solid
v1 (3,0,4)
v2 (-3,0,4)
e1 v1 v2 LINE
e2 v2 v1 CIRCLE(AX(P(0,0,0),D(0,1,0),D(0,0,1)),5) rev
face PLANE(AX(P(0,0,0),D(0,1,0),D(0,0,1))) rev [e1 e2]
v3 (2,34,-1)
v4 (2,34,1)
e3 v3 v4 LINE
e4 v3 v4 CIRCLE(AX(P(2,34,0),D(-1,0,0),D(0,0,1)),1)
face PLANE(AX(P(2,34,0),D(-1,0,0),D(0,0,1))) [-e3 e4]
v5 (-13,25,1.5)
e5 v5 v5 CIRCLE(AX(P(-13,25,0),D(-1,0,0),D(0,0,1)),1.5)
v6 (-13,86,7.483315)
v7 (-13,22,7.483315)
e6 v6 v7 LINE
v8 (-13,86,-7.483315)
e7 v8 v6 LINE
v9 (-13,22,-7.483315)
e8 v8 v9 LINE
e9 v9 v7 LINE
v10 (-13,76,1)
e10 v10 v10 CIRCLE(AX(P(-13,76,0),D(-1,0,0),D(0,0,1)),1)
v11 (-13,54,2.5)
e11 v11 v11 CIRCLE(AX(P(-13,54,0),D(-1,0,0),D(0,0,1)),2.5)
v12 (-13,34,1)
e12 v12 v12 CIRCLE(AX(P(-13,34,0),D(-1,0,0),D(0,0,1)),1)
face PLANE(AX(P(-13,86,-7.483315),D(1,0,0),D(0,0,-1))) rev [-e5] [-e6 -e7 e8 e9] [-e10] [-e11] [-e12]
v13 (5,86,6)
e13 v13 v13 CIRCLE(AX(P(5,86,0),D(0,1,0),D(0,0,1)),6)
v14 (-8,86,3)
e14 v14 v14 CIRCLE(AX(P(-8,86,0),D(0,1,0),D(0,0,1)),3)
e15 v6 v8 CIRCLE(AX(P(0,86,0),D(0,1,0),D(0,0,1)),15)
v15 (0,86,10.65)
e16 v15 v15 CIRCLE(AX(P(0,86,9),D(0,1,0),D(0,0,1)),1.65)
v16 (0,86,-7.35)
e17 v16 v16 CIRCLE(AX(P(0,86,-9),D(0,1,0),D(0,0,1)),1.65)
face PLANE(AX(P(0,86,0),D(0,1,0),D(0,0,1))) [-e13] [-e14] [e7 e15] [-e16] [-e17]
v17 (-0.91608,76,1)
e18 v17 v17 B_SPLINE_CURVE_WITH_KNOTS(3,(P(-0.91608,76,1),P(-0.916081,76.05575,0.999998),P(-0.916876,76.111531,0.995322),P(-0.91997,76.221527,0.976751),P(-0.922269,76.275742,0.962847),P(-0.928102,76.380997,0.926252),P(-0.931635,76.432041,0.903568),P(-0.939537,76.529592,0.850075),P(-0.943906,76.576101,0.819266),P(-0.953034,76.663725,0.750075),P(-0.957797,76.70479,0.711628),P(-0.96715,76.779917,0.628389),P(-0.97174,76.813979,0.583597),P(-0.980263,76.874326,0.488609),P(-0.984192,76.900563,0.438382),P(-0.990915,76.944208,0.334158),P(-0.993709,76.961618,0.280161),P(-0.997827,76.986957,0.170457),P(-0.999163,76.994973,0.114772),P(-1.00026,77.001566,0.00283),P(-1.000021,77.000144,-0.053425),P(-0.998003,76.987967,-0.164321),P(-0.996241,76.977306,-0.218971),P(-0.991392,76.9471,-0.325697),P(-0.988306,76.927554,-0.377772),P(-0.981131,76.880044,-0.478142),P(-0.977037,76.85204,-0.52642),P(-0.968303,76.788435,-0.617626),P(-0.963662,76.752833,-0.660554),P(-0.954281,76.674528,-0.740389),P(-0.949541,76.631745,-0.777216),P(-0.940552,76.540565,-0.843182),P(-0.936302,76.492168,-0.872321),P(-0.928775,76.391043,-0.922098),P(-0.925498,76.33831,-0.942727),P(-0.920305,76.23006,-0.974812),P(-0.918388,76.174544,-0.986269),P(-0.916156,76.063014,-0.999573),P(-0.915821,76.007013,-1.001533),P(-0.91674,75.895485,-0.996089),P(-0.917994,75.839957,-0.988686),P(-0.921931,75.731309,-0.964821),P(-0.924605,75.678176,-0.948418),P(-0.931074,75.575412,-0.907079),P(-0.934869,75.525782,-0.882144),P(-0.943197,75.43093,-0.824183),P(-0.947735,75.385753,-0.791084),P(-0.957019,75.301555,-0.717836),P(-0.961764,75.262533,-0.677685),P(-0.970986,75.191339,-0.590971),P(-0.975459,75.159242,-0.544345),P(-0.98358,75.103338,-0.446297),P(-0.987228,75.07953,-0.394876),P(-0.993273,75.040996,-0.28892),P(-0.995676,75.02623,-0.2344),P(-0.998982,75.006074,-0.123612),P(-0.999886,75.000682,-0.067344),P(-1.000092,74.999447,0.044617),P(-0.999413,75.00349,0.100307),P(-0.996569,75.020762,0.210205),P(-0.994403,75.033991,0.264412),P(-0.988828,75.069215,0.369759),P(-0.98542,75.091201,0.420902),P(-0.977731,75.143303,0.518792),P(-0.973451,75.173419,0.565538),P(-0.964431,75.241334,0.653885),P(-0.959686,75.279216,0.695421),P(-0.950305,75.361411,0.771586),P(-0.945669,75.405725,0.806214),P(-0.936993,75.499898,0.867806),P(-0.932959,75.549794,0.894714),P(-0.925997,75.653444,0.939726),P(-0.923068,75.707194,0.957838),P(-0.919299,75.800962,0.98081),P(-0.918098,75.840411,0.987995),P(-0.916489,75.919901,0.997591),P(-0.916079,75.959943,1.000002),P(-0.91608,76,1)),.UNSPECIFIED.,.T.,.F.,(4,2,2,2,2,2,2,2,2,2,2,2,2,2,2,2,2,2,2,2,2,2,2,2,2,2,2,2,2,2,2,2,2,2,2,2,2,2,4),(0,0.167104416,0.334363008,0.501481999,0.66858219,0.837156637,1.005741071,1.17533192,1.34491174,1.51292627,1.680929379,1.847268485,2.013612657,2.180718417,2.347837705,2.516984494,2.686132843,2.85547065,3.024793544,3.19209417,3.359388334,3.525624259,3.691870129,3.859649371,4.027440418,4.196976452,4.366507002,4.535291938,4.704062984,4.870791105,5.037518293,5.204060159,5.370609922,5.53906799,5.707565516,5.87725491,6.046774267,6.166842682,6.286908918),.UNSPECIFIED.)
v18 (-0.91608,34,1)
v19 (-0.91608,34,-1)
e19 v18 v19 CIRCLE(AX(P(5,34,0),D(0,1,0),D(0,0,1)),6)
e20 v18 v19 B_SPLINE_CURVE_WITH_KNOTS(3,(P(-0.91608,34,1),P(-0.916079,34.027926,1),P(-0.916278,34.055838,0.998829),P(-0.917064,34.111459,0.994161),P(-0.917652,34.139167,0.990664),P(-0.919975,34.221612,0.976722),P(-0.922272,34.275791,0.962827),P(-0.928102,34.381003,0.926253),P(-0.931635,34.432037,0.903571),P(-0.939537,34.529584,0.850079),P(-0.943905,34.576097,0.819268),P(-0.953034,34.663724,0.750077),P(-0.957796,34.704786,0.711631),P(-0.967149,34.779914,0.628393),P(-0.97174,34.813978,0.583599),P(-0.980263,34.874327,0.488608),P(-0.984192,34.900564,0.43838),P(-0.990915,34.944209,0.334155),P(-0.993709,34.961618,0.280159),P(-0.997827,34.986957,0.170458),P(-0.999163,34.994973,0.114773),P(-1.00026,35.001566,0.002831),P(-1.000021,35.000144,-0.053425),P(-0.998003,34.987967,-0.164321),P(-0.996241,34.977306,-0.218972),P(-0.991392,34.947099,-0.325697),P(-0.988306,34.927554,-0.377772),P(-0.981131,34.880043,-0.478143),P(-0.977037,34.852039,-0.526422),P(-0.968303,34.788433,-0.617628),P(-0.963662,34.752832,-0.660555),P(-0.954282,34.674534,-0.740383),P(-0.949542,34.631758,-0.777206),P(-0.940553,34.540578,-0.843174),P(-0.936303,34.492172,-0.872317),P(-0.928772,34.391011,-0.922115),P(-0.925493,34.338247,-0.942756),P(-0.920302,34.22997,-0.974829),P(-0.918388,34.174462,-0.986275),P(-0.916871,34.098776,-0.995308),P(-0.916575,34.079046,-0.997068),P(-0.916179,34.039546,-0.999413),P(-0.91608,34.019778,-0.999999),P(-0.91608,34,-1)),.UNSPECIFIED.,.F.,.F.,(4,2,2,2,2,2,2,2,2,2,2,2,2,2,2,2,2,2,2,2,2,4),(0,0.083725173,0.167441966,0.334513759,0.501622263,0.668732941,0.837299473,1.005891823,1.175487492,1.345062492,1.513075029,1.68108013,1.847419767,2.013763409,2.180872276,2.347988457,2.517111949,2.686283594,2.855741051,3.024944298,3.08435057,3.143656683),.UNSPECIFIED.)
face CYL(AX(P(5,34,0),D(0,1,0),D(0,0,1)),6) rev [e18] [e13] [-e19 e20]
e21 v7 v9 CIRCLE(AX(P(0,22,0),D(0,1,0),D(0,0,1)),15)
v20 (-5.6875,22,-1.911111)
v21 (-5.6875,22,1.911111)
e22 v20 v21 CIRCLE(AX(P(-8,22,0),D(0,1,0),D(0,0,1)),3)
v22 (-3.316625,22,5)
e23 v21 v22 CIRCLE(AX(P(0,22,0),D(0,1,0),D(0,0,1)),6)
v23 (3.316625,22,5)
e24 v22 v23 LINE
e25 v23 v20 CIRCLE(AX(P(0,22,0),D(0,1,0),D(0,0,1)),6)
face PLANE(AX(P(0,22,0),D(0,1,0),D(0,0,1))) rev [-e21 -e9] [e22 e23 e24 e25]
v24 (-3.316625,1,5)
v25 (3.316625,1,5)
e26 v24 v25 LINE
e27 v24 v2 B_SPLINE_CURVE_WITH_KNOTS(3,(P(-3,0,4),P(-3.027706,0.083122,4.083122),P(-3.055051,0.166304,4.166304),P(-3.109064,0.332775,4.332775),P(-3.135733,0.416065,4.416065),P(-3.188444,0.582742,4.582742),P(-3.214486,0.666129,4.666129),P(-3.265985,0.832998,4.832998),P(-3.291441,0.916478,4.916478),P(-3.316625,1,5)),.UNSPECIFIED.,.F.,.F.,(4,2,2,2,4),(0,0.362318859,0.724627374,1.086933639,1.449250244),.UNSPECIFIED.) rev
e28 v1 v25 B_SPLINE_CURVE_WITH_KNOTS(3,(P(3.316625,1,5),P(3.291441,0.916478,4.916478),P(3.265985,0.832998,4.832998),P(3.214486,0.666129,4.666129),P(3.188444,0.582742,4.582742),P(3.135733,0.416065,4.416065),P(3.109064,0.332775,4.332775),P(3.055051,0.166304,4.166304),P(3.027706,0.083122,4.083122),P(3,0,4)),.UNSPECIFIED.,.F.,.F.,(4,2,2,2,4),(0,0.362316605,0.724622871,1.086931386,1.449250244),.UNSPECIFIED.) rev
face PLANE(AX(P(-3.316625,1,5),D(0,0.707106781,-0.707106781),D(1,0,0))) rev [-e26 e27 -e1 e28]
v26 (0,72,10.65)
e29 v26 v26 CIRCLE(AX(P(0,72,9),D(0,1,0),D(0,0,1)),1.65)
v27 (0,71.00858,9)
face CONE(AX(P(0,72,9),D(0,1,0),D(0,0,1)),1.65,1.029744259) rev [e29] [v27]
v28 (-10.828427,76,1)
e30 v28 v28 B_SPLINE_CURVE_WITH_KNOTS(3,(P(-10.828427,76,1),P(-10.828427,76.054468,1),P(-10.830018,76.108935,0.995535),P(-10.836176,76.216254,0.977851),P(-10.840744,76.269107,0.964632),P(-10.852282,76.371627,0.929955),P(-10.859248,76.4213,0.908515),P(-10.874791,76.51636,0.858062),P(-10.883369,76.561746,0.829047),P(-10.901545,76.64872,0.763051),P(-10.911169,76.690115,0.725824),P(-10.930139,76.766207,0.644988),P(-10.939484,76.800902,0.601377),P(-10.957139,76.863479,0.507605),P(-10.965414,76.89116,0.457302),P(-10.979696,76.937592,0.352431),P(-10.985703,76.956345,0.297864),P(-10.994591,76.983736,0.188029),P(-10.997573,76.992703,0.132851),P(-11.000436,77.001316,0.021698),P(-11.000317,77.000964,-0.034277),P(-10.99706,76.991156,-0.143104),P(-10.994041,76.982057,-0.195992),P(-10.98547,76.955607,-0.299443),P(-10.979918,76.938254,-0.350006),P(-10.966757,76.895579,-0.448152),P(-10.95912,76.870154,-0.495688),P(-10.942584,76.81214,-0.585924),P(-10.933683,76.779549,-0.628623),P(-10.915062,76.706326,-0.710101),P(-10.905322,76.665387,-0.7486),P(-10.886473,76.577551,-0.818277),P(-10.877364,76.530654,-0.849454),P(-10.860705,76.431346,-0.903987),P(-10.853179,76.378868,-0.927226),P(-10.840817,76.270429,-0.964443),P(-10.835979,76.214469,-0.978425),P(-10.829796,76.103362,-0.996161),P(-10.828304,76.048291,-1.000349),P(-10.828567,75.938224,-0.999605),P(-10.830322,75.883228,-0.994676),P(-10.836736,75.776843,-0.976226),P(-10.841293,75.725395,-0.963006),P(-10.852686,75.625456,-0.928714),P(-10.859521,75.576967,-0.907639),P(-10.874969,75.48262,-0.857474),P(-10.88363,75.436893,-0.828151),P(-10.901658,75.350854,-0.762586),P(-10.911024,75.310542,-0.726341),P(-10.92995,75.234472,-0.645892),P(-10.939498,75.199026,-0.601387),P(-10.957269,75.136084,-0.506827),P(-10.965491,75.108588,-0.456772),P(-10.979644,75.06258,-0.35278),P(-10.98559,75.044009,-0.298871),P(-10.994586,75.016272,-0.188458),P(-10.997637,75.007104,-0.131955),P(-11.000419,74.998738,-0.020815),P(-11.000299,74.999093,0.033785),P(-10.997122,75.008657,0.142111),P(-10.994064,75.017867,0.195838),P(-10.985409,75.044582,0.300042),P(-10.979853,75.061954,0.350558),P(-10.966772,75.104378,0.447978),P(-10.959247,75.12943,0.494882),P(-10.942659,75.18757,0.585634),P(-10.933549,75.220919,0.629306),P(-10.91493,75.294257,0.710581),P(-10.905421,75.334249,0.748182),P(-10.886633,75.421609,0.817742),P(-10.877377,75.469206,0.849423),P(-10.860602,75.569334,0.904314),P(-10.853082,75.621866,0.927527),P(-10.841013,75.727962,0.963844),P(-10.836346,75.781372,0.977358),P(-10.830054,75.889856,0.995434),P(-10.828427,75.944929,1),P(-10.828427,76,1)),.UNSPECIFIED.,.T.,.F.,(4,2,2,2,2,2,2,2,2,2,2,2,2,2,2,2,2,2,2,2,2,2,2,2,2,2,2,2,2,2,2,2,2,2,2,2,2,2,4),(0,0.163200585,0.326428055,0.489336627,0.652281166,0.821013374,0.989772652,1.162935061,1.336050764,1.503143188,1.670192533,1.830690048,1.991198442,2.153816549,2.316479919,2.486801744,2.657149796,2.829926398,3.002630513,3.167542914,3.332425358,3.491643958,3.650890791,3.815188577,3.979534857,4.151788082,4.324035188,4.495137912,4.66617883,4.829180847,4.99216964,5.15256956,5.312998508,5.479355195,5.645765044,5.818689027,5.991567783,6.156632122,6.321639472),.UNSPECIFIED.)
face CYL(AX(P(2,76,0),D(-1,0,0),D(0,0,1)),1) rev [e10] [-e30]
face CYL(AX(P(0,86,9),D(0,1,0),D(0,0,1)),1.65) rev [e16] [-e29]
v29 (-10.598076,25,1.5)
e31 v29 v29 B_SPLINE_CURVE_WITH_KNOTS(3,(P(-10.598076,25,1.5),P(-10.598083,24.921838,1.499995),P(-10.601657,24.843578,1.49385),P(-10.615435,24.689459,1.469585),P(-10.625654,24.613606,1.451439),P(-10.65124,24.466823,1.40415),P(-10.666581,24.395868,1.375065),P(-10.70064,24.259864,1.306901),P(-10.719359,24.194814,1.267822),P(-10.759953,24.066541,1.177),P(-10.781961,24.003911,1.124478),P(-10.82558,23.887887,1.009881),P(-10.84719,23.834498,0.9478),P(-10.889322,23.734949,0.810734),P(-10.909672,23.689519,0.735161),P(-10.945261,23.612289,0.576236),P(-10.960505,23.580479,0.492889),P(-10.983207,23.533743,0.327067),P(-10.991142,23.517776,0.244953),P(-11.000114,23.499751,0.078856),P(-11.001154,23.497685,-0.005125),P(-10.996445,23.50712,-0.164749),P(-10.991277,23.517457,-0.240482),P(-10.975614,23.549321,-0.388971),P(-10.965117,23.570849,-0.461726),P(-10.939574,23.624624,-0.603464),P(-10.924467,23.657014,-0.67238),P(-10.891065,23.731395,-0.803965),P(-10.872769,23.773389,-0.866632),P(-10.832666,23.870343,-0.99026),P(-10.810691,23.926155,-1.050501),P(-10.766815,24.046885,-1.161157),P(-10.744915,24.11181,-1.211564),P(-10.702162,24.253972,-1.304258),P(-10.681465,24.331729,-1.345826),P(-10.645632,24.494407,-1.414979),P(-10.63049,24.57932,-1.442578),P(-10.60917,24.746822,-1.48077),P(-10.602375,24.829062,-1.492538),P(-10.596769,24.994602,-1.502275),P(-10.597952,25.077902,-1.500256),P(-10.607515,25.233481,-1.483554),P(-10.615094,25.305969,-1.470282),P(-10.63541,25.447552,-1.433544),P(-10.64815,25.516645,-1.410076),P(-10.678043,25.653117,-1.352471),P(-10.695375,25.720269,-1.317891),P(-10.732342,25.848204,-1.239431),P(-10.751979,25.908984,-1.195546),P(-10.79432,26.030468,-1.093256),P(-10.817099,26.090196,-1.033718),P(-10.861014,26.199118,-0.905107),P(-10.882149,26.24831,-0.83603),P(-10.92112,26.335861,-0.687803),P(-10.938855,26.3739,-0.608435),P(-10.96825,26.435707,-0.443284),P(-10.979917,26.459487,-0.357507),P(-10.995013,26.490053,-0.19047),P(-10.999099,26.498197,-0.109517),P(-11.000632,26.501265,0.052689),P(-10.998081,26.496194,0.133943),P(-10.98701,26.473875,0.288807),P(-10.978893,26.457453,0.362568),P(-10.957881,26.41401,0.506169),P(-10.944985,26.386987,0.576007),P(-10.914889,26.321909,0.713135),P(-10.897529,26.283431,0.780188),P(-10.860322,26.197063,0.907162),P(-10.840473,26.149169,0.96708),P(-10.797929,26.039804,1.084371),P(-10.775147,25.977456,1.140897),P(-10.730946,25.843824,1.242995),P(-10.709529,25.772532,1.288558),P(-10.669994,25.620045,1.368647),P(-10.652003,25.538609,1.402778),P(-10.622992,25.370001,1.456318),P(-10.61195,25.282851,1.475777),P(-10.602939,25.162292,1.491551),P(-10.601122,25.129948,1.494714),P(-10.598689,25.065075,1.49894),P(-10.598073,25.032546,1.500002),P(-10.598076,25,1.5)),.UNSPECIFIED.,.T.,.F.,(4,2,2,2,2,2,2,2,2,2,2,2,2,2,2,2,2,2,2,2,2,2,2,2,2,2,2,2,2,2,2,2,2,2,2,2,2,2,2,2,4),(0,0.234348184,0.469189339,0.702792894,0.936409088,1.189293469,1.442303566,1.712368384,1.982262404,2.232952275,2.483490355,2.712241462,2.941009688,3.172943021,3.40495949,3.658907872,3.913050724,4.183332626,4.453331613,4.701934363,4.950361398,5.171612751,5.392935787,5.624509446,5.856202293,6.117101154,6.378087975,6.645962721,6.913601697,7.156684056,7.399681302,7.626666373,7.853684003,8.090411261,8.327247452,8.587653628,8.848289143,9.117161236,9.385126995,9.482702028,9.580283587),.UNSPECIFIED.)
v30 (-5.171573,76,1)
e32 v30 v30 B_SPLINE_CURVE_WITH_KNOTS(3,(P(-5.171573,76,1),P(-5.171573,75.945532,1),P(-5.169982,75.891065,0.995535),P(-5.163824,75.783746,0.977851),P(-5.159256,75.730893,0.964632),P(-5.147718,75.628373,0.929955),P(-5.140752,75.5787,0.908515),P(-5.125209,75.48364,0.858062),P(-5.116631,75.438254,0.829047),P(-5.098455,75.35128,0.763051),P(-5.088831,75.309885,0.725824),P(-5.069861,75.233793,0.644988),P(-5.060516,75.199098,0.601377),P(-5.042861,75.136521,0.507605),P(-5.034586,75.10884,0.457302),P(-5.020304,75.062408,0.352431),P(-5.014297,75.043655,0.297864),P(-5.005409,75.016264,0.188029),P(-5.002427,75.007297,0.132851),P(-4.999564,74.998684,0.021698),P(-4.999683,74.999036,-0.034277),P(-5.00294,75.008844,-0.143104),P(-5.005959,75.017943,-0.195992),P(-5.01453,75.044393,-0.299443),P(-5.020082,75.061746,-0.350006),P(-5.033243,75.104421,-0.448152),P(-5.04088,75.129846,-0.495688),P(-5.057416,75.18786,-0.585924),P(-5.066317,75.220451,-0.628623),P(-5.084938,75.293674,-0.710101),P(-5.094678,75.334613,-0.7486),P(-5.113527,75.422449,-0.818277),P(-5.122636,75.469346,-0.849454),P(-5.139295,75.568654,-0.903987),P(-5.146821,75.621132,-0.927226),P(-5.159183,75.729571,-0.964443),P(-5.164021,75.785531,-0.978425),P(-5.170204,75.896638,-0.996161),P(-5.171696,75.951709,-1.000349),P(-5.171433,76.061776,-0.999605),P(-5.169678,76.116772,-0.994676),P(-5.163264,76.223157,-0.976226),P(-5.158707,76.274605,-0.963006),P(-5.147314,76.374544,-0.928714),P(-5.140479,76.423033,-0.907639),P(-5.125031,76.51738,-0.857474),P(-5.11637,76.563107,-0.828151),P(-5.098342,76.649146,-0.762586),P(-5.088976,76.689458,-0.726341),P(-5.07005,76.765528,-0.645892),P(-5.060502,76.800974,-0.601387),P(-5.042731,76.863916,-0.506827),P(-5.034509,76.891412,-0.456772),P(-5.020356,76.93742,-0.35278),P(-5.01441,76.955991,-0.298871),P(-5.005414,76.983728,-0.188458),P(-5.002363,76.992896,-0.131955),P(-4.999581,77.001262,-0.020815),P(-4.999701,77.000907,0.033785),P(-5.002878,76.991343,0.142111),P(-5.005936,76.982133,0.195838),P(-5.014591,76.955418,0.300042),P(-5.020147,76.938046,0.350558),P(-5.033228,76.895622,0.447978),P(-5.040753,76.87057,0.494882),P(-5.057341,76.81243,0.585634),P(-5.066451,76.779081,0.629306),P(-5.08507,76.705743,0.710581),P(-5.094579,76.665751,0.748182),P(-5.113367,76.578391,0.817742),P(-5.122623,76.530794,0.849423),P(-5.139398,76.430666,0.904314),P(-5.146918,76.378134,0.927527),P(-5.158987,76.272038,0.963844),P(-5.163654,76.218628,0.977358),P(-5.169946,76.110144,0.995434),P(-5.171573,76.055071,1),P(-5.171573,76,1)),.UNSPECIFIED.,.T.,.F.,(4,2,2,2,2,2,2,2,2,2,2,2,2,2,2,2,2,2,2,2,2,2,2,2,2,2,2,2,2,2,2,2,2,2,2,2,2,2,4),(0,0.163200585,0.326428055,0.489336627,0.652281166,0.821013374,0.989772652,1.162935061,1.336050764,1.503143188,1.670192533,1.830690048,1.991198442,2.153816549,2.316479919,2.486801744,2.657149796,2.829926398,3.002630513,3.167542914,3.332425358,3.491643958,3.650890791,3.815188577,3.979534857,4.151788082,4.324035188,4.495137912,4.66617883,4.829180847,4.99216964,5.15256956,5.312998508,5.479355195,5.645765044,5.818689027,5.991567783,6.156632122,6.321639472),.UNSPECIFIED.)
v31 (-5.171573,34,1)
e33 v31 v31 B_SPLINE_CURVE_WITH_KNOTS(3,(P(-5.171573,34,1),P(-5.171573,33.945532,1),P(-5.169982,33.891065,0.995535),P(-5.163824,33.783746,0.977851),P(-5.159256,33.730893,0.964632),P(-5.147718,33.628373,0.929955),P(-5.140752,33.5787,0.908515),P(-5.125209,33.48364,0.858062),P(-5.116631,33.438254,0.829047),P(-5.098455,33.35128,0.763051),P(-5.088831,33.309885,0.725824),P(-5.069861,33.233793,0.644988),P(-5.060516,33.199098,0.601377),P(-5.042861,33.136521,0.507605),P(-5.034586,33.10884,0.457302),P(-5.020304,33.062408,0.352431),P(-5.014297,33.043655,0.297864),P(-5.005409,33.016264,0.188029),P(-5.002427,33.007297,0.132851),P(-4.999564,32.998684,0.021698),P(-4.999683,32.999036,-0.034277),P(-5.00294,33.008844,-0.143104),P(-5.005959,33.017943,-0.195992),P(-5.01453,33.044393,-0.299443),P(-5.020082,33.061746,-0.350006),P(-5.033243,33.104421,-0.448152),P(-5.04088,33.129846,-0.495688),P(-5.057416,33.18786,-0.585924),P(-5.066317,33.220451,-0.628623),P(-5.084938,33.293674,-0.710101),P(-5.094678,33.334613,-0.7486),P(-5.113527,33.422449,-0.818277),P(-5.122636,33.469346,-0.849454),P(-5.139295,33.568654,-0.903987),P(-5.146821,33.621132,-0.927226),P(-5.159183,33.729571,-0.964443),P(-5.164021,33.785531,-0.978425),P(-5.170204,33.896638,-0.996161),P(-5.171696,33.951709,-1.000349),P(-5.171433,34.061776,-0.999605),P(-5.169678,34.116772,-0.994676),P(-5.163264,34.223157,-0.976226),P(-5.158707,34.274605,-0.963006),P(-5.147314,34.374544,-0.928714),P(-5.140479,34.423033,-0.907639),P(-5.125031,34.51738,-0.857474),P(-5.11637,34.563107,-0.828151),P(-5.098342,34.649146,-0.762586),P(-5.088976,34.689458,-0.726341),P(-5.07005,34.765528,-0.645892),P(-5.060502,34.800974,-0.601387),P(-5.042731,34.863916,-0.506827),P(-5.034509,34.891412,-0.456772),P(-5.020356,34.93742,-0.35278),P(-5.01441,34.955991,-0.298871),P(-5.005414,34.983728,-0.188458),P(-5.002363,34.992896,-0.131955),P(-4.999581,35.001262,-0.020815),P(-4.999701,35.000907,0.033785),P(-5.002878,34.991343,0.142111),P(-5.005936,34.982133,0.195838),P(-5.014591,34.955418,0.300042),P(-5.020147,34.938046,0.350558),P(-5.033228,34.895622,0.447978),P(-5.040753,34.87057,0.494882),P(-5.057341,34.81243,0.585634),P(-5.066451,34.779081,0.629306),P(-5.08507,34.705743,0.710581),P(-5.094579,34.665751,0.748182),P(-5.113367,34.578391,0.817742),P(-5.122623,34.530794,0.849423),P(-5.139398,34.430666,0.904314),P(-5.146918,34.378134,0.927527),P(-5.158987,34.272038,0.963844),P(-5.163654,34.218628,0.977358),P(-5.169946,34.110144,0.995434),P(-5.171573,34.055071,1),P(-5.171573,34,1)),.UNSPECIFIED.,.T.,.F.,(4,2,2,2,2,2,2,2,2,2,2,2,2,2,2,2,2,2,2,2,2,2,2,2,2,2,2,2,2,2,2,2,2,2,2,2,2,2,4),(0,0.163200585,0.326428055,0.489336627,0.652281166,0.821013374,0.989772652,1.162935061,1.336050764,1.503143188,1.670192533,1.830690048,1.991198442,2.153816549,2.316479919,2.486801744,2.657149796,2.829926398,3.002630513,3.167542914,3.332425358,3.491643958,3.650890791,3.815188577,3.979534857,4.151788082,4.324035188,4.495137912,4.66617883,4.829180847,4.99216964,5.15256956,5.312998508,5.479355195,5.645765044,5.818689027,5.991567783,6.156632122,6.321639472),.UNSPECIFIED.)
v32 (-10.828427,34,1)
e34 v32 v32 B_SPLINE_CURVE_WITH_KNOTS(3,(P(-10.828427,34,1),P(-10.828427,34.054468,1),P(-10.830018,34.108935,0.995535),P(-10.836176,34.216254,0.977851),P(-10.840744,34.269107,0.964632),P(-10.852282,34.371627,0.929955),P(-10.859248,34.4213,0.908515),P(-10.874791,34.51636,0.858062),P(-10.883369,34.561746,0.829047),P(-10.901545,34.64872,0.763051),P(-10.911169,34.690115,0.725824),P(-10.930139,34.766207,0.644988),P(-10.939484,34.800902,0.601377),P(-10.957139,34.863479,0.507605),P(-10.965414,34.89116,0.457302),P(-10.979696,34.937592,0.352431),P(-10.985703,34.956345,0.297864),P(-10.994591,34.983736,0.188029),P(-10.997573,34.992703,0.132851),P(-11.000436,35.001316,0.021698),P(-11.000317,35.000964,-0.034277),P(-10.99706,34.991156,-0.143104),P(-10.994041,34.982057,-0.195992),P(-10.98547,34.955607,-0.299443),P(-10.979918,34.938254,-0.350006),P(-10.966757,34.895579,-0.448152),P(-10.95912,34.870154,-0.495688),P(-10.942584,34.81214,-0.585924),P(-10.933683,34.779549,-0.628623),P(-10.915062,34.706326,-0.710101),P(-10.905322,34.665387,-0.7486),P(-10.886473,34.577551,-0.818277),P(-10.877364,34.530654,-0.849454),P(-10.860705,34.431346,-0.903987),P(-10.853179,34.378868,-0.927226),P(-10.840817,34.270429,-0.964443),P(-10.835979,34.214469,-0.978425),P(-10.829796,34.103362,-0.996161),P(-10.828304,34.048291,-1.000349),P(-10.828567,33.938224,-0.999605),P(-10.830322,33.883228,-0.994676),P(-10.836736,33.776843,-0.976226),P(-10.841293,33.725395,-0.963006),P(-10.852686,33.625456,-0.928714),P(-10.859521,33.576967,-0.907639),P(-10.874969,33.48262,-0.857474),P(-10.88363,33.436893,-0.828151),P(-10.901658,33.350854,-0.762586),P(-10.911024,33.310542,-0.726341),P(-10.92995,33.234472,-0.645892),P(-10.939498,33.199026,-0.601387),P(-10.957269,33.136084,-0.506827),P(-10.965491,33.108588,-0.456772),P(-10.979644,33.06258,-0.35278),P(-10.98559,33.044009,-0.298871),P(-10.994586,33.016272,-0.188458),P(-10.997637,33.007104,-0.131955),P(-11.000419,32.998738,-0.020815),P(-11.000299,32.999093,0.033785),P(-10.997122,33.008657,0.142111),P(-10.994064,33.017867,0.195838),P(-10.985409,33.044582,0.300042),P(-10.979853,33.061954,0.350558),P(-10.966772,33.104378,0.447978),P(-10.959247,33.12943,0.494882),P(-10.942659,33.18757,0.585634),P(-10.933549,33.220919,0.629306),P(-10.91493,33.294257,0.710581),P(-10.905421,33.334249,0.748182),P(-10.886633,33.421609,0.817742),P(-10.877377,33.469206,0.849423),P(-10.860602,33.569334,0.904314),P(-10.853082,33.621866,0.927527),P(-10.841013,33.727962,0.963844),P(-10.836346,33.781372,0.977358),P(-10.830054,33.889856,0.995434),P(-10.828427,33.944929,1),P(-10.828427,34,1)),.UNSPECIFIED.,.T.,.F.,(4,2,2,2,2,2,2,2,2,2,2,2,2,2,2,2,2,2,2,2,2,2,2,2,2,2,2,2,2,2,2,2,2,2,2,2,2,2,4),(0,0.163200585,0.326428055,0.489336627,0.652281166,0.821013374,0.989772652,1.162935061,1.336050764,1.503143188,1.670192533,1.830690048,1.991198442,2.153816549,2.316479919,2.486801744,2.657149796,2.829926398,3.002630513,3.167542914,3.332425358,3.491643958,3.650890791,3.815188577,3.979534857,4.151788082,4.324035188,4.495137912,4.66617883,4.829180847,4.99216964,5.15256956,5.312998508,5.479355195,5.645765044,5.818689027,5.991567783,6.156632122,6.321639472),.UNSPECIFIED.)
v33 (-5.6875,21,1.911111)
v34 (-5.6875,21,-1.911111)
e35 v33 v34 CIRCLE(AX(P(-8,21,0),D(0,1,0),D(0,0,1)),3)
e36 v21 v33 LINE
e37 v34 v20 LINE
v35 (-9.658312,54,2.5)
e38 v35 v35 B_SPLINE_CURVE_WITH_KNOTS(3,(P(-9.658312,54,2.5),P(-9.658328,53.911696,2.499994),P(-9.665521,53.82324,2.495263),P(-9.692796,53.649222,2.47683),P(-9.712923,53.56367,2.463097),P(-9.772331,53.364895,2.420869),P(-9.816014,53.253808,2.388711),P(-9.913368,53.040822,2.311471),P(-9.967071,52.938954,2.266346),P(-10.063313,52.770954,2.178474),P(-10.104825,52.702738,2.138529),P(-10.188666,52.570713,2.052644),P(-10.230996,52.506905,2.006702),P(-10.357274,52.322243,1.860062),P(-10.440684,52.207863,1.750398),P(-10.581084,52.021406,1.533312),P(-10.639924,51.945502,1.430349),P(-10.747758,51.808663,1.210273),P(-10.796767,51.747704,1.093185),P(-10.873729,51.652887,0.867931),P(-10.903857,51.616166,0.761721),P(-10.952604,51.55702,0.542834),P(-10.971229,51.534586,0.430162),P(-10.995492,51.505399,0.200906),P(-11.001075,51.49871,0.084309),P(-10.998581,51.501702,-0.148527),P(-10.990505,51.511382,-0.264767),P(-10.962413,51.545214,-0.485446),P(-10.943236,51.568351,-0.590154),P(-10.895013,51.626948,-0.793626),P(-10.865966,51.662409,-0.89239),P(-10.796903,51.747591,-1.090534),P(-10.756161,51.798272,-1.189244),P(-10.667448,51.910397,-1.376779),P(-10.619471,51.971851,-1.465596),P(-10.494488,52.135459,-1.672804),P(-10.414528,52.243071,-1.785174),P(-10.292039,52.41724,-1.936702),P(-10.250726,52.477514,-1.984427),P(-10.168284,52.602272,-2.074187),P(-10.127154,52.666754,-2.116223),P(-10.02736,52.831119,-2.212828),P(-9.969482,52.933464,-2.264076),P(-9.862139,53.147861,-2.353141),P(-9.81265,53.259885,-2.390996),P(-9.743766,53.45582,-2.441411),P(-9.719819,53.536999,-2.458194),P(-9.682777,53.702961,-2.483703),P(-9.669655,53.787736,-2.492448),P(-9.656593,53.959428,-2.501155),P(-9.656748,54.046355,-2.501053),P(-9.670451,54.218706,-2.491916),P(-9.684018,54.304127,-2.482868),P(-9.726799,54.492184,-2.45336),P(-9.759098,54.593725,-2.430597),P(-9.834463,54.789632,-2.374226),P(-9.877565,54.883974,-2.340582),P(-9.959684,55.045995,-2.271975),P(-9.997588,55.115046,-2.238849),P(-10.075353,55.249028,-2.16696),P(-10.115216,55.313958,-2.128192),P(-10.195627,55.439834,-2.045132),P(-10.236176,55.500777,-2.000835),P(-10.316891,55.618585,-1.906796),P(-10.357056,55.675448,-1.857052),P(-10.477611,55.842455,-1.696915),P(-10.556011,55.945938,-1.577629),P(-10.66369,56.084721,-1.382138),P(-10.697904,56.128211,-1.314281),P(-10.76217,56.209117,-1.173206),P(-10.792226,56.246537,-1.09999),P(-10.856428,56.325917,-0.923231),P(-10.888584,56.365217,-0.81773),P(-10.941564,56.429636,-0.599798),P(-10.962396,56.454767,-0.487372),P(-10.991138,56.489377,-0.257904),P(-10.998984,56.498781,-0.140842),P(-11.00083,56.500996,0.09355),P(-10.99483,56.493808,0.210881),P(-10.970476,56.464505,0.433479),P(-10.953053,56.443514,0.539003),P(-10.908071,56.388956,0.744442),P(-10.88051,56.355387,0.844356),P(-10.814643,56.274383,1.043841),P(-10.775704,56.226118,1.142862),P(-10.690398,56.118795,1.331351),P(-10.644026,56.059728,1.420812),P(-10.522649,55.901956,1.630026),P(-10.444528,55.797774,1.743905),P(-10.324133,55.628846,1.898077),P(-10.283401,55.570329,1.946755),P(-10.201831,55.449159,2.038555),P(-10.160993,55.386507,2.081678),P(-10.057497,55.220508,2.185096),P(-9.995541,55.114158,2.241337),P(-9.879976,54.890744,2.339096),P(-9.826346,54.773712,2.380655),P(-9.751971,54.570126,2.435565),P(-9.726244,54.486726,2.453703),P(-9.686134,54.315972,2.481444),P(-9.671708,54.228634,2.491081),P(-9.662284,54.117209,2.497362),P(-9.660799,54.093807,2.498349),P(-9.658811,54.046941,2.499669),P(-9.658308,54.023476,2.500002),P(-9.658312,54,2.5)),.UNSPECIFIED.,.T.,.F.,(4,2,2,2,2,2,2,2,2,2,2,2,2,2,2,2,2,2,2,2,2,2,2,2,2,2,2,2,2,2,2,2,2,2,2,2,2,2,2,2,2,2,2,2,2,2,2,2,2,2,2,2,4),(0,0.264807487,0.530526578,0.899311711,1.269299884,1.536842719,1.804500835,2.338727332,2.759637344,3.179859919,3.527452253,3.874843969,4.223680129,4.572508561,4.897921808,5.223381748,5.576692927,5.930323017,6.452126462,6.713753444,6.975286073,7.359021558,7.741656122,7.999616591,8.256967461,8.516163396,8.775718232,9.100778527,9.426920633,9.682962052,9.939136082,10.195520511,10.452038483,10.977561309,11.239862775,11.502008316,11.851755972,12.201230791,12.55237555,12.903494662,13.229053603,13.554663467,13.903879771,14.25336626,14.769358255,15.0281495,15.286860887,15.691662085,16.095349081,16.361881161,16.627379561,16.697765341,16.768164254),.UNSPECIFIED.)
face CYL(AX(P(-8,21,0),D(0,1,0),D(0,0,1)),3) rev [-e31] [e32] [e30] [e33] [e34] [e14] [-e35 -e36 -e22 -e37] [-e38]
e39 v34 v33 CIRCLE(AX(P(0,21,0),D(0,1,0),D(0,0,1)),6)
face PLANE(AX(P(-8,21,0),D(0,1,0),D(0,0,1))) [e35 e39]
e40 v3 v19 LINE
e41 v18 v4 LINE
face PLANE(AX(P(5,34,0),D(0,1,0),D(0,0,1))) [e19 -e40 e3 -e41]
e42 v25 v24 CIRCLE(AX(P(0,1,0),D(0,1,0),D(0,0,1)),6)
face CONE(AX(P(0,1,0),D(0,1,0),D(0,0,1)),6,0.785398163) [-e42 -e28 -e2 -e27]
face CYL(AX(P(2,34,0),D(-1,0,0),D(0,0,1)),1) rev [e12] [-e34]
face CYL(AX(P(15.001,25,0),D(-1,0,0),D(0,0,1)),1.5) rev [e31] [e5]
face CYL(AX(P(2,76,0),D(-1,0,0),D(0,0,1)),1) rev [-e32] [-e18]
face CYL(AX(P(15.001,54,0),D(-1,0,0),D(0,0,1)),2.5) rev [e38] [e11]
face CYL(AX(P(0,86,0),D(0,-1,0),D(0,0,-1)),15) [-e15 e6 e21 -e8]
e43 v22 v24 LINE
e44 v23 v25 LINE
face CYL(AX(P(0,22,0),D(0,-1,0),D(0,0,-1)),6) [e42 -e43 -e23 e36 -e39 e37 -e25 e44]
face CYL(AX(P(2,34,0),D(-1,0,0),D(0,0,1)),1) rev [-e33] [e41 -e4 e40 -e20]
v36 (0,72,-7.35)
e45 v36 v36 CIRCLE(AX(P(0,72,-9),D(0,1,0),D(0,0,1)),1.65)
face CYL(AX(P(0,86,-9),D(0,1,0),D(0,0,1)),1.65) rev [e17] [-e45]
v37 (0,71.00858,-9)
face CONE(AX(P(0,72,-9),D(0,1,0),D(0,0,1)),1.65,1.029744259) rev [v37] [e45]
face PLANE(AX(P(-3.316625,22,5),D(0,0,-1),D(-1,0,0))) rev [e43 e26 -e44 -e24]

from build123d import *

# Parameters (mm, degrees)
BOSS_EXTRUDE1_DEPTH     = 22
BOSS_EXTRUDE2_DEPTH     = 64
SKETCH3_R               = 3
CUT_EXTRUDE1_DEPTH      = 65
SKETCH4_R               = 6
CUT_EXTRUDE2_DEPTH      = 52
M4_TAPPED_HOLE1_D       = 3.3
M4_TAPPED_HOLE1_DEPTH   = 14
M4_TAPPED_HOLE1_TIP     = 0.991420021
CUT_EXTRUDE3_REACH      = 93.679
CUT_EXTRUDE3_END_RADIUS = 3
SKETCH8_R               = 2.5
SKETCH8_R_2             = 1.5
SKETCH9_R               = 1
CUT_EXTRUDE4_DEPTH      = 15
CHAMFER1_SIZE           = 1


with BuildPart() as part:
    # Sketch1 → Boss-Extrude1 (new body)
    with BuildSketch(Plane(origin=(0, 0, 0), x_dir=(1, 0, 0), z_dir=(0, 1, 0))):
        with BuildLine():
            Line((-3.31662479, -5), (3.31662479, -5))
            ThreePointArc((3.31662479, -5), (0, 6), (-3.31662479, -5))
        make_face()
    extrude(amount=BOSS_EXTRUDE1_DEPTH)

    # Sketch2 → Boss-Extrude2 (add)
    with BuildSketch(Plane(origin=(0, 22, 0), x_dir=(1, 0, 0), z_dir=(0, 1, 0))):
        with BuildLine():
            Line((-13, 7.483314774), (-13, -7.483314774))
            ThreePointArc((-13, -7.483314774), (15, 0), (-13, 7.483314774))
        make_face()
    extrude(amount=BOSS_EXTRUDE2_DEPTH)

    # Sketch3 → Cut-Extrude1 (cut)
    with BuildSketch(Plane(origin=(0, 86, 0), x_dir=(1, 0, 0), z_dir=(0, 1, 0))):
        with Locations(Location((-8, 0, 0), (0, 0, 270))):
            Circle(SKETCH3_R)
    extrude(amount=-CUT_EXTRUDE1_DEPTH, mode=Mode.SUBTRACT)

    # Sketch4 → Cut-Extrude2 (cut)
    with BuildSketch(Plane(origin=(0, 86, 0), x_dir=(1, 0, 0), z_dir=(0, 1, 0))):
        with Locations(Location((5, 0, 0), (0, 0, 270))):
            Circle(SKETCH4_R)
    extrude(amount=-CUT_EXTRUDE2_DEPTH, mode=Mode.SUBTRACT)

    # M4 Tapped Hole1
    with Locations(Plane(origin=(0, 86, 0), x_dir=(1, 0, 0), z_dir=(0, 1, 0))):
        with Locations((0, 9), (0, -9)):
            Hole(M4_TAPPED_HOLE1_D / 2, depth=M4_TAPPED_HOLE1_DEPTH)
            with Locations((0, 0, -(M4_TAPPED_HOLE1_DEPTH + M4_TAPPED_HOLE1_TIP / 2))):  # 118° drill point
                Cone(0, M4_TAPPED_HOLE1_D / 2, M4_TAPPED_HOLE1_TIP, mode=Mode.SUBTRACT)

    # Cut-Extrude3: up to this cylinder (the profile starts outside it)
    cut_extrude3_end = Plane(origin=(-8, 39.5, 0), z_dir=(0, 1, 0)) * Cylinder(CUT_EXTRUDE3_END_RADIUS, 223.358, mode=Mode.PRIVATE)
    # Sketch8 → Cut-Extrude3 (cut, up to the surface)
    with BuildSketch(Plane.ZY.offset(13), mode=Mode.PRIVATE) as cut_extrude3_sk1:
        with Locations((0, 54)):
            Circle(SKETCH8_R)
    cut_extrude3_tool1 = extrude(cut_extrude3_sk1.sketch, amount=-CUT_EXTRUDE3_REACH, mode=Mode.PRIVATE) - cut_extrude3_end
    add(cut_extrude3_tool1.solids().sort_by_distance((-13, 54, 0))[0], mode=Mode.SUBTRACT)
    # Sketch8 → Cut-Extrude3 (cut, up to the surface)
    with BuildSketch(Plane.ZY.offset(13), mode=Mode.PRIVATE) as cut_extrude3_sk2:
        with Locations((0, 25)):
            Circle(SKETCH8_R_2)
    cut_extrude3_tool2 = extrude(cut_extrude3_sk2.sketch, amount=-CUT_EXTRUDE3_REACH, mode=Mode.PRIVATE) - cut_extrude3_end
    add(cut_extrude3_tool2.solids().sort_by_distance((-13, 25, 0))[0], mode=Mode.SUBTRACT)

    # Sketch9 → Cut-Extrude4 (cut)
    with BuildSketch(Plane.ZY.offset(13)):
        with Locations((0, 76)):
            Circle(SKETCH9_R)
        with Locations((0, 34)):
            Circle(SKETCH9_R)
    extrude(amount=-CUT_EXTRUDE4_DEPTH, mode=Mode.SUBTRACT)

    # Chamfer1
    chamfer1_edges = [part.edges().sort_by_distance(p)[0] for p in [
        (0, 0, 5),
        (0, 0, -6),
    ]]
    chamfer(chamfer1_edges, length=CHAMFER1_SIZE - 0.0001)  # a hair under: the kernel refuses the full size


solid = part.part
